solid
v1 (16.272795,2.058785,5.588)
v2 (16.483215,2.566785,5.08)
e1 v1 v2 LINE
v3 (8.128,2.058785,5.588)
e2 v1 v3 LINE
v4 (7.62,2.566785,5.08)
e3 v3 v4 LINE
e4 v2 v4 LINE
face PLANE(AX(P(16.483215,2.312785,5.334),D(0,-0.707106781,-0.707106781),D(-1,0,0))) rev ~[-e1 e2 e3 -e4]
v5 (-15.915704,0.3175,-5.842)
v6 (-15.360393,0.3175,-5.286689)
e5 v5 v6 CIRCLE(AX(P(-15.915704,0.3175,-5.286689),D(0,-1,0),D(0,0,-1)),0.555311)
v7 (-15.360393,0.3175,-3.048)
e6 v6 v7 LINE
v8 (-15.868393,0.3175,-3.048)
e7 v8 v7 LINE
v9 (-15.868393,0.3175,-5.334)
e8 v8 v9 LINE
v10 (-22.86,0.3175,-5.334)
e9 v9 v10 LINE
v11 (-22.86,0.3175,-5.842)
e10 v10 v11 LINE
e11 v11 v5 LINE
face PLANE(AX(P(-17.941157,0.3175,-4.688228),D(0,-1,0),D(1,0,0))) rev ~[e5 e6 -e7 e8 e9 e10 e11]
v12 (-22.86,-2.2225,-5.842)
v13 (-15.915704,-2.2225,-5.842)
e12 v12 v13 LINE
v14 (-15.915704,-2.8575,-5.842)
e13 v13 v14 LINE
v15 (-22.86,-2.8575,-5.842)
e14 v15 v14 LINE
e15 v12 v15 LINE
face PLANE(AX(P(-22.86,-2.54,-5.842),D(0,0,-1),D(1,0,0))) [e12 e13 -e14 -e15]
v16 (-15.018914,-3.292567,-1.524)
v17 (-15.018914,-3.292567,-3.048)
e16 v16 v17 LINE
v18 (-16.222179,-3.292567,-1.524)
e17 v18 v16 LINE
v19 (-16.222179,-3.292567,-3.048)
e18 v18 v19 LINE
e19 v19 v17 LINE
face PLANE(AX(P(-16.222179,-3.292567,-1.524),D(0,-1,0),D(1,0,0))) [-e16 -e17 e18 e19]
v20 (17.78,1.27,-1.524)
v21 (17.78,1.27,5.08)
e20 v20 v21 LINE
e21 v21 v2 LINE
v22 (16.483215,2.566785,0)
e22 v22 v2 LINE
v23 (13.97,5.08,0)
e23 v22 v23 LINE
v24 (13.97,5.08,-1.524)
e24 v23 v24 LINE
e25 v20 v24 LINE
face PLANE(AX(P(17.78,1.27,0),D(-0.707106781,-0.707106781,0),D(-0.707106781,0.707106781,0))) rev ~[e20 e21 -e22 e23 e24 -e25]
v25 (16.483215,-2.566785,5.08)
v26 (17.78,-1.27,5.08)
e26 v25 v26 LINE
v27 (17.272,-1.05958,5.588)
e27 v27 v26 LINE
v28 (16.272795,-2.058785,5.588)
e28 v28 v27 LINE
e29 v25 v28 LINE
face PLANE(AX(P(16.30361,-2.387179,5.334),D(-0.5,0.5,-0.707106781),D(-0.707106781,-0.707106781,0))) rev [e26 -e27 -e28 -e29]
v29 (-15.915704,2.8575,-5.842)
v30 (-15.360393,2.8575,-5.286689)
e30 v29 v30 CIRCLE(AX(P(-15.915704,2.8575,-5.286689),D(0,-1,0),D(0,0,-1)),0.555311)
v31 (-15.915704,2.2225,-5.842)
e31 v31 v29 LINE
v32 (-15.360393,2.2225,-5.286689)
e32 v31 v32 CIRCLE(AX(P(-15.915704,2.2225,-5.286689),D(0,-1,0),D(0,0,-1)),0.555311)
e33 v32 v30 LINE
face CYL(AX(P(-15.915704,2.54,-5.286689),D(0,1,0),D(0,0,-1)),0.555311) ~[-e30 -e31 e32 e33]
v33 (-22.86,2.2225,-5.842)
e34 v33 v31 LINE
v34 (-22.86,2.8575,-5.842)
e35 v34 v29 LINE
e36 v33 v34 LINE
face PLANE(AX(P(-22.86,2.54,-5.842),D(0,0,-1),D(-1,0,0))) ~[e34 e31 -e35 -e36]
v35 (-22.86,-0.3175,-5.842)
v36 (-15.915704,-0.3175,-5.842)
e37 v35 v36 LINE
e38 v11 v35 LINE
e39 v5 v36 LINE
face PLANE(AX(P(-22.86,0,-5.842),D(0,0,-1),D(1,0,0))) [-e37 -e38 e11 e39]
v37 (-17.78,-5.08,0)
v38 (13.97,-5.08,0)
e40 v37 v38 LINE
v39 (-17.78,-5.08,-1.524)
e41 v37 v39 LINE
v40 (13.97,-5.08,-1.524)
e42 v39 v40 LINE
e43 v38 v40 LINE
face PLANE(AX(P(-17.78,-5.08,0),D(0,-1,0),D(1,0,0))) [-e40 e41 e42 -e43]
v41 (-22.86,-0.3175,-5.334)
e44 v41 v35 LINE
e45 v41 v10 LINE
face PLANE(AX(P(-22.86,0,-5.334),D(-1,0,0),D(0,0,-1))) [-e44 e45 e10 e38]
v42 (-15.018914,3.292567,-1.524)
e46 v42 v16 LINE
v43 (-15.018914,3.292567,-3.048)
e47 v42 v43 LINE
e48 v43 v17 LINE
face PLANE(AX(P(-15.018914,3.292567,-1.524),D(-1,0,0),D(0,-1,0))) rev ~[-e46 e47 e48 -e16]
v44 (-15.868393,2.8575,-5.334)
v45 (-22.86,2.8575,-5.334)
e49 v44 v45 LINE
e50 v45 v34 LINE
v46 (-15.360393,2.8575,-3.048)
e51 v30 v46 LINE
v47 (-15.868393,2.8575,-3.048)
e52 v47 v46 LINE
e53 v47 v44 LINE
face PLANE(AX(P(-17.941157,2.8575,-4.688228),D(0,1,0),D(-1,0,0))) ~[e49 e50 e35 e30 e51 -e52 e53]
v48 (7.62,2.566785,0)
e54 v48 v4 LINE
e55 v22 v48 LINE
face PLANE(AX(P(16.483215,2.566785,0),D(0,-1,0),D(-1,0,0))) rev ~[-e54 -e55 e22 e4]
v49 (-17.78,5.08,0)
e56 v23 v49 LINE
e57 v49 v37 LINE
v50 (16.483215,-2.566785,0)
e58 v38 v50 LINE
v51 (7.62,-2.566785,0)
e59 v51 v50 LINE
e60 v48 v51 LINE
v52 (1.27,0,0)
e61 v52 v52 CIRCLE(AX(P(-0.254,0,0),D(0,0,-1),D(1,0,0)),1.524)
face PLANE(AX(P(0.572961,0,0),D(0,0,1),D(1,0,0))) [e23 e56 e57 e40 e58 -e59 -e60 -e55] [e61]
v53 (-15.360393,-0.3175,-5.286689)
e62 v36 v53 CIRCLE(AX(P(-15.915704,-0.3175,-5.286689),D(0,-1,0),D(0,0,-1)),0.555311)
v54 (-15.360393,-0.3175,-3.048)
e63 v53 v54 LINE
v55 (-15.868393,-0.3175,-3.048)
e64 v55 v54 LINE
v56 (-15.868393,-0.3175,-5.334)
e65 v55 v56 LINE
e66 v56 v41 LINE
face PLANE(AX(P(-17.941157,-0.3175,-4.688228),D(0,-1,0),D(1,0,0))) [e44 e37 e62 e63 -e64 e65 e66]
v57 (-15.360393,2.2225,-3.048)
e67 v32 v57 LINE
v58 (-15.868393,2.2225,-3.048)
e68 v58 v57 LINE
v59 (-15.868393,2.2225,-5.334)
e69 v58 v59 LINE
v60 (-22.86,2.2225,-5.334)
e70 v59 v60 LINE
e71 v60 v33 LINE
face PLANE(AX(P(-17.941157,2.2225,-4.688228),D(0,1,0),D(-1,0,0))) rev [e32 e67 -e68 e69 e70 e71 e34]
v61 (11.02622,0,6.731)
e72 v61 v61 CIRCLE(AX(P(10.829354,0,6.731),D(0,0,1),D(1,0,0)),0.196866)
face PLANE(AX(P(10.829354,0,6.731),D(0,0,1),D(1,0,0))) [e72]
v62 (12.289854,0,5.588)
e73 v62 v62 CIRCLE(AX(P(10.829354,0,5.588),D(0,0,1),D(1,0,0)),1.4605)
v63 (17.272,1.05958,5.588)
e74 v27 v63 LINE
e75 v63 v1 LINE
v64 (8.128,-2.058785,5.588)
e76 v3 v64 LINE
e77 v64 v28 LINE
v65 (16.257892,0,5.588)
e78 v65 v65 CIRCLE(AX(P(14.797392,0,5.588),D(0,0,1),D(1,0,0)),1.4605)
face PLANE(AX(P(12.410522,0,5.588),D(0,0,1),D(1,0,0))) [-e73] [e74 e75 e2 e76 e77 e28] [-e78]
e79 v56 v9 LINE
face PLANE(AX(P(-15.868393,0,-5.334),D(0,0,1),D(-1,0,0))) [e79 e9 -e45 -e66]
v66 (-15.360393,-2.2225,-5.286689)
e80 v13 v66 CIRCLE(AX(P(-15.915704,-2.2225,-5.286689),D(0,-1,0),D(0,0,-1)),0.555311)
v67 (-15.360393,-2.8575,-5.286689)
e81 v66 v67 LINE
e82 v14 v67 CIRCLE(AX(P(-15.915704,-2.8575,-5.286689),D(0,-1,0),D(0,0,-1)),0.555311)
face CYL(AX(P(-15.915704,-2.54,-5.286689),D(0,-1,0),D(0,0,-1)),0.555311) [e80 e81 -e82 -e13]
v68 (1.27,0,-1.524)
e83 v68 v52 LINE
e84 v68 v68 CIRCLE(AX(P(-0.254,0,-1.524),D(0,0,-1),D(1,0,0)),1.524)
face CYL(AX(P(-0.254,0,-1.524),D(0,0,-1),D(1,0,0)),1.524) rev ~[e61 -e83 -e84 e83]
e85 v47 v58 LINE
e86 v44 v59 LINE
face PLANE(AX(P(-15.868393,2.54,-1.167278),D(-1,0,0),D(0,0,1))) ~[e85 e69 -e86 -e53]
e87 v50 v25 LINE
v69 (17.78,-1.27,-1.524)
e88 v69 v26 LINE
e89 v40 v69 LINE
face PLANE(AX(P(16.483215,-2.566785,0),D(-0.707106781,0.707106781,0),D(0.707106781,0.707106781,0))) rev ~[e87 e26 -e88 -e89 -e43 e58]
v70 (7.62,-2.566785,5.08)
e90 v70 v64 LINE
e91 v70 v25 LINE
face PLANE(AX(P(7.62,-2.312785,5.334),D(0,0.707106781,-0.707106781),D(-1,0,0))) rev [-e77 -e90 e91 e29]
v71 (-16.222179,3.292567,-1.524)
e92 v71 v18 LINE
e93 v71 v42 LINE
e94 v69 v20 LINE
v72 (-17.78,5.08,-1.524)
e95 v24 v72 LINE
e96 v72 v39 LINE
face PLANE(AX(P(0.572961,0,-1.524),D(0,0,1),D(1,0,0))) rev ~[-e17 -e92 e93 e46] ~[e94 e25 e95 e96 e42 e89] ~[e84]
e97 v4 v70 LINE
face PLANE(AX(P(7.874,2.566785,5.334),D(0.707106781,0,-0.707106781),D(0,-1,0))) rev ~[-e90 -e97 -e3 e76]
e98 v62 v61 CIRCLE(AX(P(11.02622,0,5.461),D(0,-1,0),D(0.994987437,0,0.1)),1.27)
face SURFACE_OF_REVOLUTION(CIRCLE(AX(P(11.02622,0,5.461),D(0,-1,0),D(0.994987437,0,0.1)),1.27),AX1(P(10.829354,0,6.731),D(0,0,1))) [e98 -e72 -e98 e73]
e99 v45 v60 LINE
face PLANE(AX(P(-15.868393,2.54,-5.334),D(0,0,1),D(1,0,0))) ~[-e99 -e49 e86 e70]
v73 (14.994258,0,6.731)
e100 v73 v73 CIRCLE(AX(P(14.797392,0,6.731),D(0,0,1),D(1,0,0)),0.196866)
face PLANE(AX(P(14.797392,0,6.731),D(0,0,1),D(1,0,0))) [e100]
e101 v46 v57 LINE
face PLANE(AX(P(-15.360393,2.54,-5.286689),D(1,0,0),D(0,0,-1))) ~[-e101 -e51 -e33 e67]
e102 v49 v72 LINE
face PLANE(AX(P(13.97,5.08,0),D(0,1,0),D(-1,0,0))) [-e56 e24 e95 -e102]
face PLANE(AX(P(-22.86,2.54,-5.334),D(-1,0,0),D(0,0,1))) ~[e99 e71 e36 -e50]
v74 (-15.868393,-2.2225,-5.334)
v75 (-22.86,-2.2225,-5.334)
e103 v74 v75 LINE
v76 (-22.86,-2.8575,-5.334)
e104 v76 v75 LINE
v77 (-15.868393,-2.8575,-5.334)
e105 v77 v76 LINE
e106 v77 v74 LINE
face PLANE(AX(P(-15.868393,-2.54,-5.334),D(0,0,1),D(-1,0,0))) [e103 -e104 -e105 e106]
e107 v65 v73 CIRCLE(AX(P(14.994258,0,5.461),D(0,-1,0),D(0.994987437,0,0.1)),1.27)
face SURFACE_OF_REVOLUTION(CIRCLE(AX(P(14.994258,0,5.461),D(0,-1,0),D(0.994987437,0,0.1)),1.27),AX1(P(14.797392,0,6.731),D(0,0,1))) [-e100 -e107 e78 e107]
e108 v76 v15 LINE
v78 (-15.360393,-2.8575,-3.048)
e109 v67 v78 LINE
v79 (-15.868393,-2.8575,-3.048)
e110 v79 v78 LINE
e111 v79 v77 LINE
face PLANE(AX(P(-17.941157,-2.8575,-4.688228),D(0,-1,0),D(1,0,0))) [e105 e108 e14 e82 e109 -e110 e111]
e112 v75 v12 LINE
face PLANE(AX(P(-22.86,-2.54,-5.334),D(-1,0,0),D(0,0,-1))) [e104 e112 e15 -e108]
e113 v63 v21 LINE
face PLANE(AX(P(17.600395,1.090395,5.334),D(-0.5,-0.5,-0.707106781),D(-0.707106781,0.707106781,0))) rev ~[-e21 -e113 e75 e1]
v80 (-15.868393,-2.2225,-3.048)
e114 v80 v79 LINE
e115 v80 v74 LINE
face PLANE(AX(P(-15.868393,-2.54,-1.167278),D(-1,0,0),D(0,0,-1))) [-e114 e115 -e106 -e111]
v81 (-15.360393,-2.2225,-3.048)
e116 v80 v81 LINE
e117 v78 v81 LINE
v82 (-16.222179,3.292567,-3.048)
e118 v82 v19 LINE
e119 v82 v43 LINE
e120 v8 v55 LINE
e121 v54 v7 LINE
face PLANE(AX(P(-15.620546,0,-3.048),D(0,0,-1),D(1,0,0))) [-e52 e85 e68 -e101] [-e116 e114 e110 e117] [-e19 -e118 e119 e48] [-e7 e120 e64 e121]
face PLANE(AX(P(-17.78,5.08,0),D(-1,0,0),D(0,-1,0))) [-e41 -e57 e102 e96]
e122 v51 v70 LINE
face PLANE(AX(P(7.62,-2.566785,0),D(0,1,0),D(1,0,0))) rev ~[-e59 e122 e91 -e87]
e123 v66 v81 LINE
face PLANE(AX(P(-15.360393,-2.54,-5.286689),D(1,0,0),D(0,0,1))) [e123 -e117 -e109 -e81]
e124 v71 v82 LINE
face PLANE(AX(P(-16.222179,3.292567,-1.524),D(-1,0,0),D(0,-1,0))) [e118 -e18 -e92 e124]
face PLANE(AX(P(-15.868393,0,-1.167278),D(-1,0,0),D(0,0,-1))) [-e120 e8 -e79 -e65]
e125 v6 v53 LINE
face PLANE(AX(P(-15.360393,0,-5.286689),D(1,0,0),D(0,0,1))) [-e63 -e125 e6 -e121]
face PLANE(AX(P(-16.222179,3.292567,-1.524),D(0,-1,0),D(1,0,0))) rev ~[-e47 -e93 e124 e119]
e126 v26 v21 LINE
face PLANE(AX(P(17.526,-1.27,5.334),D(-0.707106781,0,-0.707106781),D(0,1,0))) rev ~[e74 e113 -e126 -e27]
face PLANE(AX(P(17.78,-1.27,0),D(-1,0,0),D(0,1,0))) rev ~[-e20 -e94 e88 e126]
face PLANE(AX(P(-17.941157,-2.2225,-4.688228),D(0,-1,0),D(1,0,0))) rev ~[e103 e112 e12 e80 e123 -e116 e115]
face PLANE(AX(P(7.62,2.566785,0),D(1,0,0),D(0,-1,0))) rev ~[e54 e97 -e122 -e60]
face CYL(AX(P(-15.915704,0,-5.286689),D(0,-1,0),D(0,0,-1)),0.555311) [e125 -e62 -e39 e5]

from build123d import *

# Parameters (mm, degrees)
F1_DEPTH  = 1.524
F3_DEPTH  = 5.588
F4_R      = 1.4605
F5_DEPTH  = 1.143
F7_SIZE   = 0.508
F9_DEPTH  = 0.3175
F12_W     = 1.2032650411
F12_H     = 6.585133262
F12_W_2   = 0.508
F12_H_2   = 0.635
F13_DEPTH = 1.524
F14_R     = 1.524
F15_DEPTH = 25.4


# Not quite as in the source:
# - a fillet or chamfer that OpenCascade refuses, or shapes differently, is made with other operations: its cross-section is extruded or revolved along the edge and cut away or added


with BuildPart() as f1:
    # F0 (on Top) → F1 (new body)
    with BuildSketch(Plane.XY):
        Polygon((-17.78, -5.08), (13.97, -5.08), (16.4832153797, -2.5667846203), (7.62, -2.5667846203), (7.62, 2.5667846203), (16.4832153797, 2.5667846203), (13.97, 5.08), (-17.78, 5.08), align=None)
        Polygon((7.62, -2.5667846203), (16.4832153797, -2.5667846203), (17.78, -1.27), (17.78, 1.27), (16.4832153797, 2.5667846203), (7.62, 2.5667846203), align=None)
    extrude(amount=-F1_DEPTH)

    # F2 (on face) → F3 (join)
    with BuildSketch(Plane.XY):
        Polygon((16.4832153797, -2.5667846203), (17.78, -1.27), (17.78, 1.27), (16.4832153797, 2.5667846203), (7.62, 2.5667846203), (7.62, -2.5667846203), align=None)
    extrude(amount=F3_DEPTH)

    # F4 (on face) → F5 (join)
    with BuildSketch(Plane.XY.offset(5.588)):
        with Locations((10.829353705, 0)):
            Circle(F4_R)
        with Locations((14.7973923013, 0)):
            Circle(F4_R)
    extrude(amount=F5_DEPTH)

    # F6: fillet of radius 1.27 on 2 edges, made by hand

    # F6_s1 → F6_t2 (revolve, cut)
    with BuildSketch(Plane.XZ):
        with BuildLine():
            ThreePointArc((12.289853705, 5.588), (11.8781615594, 6.4028572079), (11.0262196599, 6.731))
            Line((11.0262196599, 6.731), (12.289853705, 6.731))
            Line((12.289853705, 6.731), (12.289853705, 5.588))
        make_face()
    revolve(axis=Axis((10.829353705, 0, 6.731), (0, 0, 1)), mode=Mode.SUBTRACT)

    # F6_s3 → F6_t4 (revolve, cut)
    with BuildSketch(Plane.XZ):
        with BuildLine():
            ThreePointArc((16.2578923013, 5.588), (15.8462001556, 6.4028572079), (14.9942582561, 6.731))
            Line((14.9942582561, 6.731), (16.2578923013, 6.731))
            Line((16.2578923013, 6.731), (16.2578923013, 5.588))
        make_face()
    revolve(axis=Axis((14.7973923013, 0, 6.731), (0, 0, 1)), mode=Mode.SUBTRACT)

    # F7
    f7_edges = [f1.edges().sort_by_distance(p)[0] for p in [
        (12.051608, -2.566785, 5.588),
        (12.051608, 2.566785, 5.588),
        (7.62, 0, 5.588),
        (17.78, 0, 5.588),
        (17.131608, -1.918392, 5.588),
        (17.131608, 1.918392, 5.588),
    ]]
    chamfer(f7_edges, length=F7_SIZE)

    # F11: F10_1 across plane


with BuildPart() as f9:
    # F8 (on Front) → F9 (new body, symmetric)
    with BuildSketch(Plane.XZ):
        with BuildLine():
            Line((-22.86, -5.334), (-22.86, -5.842))
            Line((-22.86, -5.842), (-15.9157037269, -5.842))
            ThreePointArc((-15.9157037269, -5.842), (-15.5230394847, -5.6793531454), (-15.3603926301, -5.2866889032))
            Line((-15.3603926301, -5.2866889032), (-15.3603926301, -1.1672781548))
            Line((-15.3603926301, -1.1672781548), (-15.8683926301, -1.1672781548))
            Line((-15.8683926301, -1.1672781548), (-15.8683926301, -5.334))
            Line((-15.8683926301, -5.334), (-22.86, -5.334))
        make_face()
    extrude(amount=F9_DEPTH, both=True)


with BuildPart() as f10_1:
    # F10: copy of F9
    add(f9.part.moved(Location((0, -2.54, 0))))


with BuildPart() as f1_1:
    add(f1.part)
    add(f10_1.part.mirror(Plane.XZ))


    add(f9.part)  # F13 merges F9

    add(f10_1.part)  # F13 merges F10_1
    # F12 (on face) → F13 (join)
    with BuildSketch(Plane(origin=(0, 0, -1.524), x_dir=(1, 0, 0), z_dir=(0, 0, -1))):
        with Locations((-15.6205464154, 0)):
            Rectangle(F12_W, F12_H)
        with Locations((-15.6143926301, -2.54)):
            Rectangle(F12_W_2, F12_H_2, mode=Mode.SUBTRACT)
    extrude(amount=F13_DEPTH)

    # F14 (on face) → F15 (cut)
    with BuildSketch(Plane(origin=(0, 0, -1.524), x_dir=(1, 0, 0), z_dir=(0, 0, -1))):
        with Locations((-0.254, 0)):
            Circle(F14_R)
    extrude(amount=-F15_DEPTH, mode=Mode.SUBTRACT)


solid = f1_1.part
